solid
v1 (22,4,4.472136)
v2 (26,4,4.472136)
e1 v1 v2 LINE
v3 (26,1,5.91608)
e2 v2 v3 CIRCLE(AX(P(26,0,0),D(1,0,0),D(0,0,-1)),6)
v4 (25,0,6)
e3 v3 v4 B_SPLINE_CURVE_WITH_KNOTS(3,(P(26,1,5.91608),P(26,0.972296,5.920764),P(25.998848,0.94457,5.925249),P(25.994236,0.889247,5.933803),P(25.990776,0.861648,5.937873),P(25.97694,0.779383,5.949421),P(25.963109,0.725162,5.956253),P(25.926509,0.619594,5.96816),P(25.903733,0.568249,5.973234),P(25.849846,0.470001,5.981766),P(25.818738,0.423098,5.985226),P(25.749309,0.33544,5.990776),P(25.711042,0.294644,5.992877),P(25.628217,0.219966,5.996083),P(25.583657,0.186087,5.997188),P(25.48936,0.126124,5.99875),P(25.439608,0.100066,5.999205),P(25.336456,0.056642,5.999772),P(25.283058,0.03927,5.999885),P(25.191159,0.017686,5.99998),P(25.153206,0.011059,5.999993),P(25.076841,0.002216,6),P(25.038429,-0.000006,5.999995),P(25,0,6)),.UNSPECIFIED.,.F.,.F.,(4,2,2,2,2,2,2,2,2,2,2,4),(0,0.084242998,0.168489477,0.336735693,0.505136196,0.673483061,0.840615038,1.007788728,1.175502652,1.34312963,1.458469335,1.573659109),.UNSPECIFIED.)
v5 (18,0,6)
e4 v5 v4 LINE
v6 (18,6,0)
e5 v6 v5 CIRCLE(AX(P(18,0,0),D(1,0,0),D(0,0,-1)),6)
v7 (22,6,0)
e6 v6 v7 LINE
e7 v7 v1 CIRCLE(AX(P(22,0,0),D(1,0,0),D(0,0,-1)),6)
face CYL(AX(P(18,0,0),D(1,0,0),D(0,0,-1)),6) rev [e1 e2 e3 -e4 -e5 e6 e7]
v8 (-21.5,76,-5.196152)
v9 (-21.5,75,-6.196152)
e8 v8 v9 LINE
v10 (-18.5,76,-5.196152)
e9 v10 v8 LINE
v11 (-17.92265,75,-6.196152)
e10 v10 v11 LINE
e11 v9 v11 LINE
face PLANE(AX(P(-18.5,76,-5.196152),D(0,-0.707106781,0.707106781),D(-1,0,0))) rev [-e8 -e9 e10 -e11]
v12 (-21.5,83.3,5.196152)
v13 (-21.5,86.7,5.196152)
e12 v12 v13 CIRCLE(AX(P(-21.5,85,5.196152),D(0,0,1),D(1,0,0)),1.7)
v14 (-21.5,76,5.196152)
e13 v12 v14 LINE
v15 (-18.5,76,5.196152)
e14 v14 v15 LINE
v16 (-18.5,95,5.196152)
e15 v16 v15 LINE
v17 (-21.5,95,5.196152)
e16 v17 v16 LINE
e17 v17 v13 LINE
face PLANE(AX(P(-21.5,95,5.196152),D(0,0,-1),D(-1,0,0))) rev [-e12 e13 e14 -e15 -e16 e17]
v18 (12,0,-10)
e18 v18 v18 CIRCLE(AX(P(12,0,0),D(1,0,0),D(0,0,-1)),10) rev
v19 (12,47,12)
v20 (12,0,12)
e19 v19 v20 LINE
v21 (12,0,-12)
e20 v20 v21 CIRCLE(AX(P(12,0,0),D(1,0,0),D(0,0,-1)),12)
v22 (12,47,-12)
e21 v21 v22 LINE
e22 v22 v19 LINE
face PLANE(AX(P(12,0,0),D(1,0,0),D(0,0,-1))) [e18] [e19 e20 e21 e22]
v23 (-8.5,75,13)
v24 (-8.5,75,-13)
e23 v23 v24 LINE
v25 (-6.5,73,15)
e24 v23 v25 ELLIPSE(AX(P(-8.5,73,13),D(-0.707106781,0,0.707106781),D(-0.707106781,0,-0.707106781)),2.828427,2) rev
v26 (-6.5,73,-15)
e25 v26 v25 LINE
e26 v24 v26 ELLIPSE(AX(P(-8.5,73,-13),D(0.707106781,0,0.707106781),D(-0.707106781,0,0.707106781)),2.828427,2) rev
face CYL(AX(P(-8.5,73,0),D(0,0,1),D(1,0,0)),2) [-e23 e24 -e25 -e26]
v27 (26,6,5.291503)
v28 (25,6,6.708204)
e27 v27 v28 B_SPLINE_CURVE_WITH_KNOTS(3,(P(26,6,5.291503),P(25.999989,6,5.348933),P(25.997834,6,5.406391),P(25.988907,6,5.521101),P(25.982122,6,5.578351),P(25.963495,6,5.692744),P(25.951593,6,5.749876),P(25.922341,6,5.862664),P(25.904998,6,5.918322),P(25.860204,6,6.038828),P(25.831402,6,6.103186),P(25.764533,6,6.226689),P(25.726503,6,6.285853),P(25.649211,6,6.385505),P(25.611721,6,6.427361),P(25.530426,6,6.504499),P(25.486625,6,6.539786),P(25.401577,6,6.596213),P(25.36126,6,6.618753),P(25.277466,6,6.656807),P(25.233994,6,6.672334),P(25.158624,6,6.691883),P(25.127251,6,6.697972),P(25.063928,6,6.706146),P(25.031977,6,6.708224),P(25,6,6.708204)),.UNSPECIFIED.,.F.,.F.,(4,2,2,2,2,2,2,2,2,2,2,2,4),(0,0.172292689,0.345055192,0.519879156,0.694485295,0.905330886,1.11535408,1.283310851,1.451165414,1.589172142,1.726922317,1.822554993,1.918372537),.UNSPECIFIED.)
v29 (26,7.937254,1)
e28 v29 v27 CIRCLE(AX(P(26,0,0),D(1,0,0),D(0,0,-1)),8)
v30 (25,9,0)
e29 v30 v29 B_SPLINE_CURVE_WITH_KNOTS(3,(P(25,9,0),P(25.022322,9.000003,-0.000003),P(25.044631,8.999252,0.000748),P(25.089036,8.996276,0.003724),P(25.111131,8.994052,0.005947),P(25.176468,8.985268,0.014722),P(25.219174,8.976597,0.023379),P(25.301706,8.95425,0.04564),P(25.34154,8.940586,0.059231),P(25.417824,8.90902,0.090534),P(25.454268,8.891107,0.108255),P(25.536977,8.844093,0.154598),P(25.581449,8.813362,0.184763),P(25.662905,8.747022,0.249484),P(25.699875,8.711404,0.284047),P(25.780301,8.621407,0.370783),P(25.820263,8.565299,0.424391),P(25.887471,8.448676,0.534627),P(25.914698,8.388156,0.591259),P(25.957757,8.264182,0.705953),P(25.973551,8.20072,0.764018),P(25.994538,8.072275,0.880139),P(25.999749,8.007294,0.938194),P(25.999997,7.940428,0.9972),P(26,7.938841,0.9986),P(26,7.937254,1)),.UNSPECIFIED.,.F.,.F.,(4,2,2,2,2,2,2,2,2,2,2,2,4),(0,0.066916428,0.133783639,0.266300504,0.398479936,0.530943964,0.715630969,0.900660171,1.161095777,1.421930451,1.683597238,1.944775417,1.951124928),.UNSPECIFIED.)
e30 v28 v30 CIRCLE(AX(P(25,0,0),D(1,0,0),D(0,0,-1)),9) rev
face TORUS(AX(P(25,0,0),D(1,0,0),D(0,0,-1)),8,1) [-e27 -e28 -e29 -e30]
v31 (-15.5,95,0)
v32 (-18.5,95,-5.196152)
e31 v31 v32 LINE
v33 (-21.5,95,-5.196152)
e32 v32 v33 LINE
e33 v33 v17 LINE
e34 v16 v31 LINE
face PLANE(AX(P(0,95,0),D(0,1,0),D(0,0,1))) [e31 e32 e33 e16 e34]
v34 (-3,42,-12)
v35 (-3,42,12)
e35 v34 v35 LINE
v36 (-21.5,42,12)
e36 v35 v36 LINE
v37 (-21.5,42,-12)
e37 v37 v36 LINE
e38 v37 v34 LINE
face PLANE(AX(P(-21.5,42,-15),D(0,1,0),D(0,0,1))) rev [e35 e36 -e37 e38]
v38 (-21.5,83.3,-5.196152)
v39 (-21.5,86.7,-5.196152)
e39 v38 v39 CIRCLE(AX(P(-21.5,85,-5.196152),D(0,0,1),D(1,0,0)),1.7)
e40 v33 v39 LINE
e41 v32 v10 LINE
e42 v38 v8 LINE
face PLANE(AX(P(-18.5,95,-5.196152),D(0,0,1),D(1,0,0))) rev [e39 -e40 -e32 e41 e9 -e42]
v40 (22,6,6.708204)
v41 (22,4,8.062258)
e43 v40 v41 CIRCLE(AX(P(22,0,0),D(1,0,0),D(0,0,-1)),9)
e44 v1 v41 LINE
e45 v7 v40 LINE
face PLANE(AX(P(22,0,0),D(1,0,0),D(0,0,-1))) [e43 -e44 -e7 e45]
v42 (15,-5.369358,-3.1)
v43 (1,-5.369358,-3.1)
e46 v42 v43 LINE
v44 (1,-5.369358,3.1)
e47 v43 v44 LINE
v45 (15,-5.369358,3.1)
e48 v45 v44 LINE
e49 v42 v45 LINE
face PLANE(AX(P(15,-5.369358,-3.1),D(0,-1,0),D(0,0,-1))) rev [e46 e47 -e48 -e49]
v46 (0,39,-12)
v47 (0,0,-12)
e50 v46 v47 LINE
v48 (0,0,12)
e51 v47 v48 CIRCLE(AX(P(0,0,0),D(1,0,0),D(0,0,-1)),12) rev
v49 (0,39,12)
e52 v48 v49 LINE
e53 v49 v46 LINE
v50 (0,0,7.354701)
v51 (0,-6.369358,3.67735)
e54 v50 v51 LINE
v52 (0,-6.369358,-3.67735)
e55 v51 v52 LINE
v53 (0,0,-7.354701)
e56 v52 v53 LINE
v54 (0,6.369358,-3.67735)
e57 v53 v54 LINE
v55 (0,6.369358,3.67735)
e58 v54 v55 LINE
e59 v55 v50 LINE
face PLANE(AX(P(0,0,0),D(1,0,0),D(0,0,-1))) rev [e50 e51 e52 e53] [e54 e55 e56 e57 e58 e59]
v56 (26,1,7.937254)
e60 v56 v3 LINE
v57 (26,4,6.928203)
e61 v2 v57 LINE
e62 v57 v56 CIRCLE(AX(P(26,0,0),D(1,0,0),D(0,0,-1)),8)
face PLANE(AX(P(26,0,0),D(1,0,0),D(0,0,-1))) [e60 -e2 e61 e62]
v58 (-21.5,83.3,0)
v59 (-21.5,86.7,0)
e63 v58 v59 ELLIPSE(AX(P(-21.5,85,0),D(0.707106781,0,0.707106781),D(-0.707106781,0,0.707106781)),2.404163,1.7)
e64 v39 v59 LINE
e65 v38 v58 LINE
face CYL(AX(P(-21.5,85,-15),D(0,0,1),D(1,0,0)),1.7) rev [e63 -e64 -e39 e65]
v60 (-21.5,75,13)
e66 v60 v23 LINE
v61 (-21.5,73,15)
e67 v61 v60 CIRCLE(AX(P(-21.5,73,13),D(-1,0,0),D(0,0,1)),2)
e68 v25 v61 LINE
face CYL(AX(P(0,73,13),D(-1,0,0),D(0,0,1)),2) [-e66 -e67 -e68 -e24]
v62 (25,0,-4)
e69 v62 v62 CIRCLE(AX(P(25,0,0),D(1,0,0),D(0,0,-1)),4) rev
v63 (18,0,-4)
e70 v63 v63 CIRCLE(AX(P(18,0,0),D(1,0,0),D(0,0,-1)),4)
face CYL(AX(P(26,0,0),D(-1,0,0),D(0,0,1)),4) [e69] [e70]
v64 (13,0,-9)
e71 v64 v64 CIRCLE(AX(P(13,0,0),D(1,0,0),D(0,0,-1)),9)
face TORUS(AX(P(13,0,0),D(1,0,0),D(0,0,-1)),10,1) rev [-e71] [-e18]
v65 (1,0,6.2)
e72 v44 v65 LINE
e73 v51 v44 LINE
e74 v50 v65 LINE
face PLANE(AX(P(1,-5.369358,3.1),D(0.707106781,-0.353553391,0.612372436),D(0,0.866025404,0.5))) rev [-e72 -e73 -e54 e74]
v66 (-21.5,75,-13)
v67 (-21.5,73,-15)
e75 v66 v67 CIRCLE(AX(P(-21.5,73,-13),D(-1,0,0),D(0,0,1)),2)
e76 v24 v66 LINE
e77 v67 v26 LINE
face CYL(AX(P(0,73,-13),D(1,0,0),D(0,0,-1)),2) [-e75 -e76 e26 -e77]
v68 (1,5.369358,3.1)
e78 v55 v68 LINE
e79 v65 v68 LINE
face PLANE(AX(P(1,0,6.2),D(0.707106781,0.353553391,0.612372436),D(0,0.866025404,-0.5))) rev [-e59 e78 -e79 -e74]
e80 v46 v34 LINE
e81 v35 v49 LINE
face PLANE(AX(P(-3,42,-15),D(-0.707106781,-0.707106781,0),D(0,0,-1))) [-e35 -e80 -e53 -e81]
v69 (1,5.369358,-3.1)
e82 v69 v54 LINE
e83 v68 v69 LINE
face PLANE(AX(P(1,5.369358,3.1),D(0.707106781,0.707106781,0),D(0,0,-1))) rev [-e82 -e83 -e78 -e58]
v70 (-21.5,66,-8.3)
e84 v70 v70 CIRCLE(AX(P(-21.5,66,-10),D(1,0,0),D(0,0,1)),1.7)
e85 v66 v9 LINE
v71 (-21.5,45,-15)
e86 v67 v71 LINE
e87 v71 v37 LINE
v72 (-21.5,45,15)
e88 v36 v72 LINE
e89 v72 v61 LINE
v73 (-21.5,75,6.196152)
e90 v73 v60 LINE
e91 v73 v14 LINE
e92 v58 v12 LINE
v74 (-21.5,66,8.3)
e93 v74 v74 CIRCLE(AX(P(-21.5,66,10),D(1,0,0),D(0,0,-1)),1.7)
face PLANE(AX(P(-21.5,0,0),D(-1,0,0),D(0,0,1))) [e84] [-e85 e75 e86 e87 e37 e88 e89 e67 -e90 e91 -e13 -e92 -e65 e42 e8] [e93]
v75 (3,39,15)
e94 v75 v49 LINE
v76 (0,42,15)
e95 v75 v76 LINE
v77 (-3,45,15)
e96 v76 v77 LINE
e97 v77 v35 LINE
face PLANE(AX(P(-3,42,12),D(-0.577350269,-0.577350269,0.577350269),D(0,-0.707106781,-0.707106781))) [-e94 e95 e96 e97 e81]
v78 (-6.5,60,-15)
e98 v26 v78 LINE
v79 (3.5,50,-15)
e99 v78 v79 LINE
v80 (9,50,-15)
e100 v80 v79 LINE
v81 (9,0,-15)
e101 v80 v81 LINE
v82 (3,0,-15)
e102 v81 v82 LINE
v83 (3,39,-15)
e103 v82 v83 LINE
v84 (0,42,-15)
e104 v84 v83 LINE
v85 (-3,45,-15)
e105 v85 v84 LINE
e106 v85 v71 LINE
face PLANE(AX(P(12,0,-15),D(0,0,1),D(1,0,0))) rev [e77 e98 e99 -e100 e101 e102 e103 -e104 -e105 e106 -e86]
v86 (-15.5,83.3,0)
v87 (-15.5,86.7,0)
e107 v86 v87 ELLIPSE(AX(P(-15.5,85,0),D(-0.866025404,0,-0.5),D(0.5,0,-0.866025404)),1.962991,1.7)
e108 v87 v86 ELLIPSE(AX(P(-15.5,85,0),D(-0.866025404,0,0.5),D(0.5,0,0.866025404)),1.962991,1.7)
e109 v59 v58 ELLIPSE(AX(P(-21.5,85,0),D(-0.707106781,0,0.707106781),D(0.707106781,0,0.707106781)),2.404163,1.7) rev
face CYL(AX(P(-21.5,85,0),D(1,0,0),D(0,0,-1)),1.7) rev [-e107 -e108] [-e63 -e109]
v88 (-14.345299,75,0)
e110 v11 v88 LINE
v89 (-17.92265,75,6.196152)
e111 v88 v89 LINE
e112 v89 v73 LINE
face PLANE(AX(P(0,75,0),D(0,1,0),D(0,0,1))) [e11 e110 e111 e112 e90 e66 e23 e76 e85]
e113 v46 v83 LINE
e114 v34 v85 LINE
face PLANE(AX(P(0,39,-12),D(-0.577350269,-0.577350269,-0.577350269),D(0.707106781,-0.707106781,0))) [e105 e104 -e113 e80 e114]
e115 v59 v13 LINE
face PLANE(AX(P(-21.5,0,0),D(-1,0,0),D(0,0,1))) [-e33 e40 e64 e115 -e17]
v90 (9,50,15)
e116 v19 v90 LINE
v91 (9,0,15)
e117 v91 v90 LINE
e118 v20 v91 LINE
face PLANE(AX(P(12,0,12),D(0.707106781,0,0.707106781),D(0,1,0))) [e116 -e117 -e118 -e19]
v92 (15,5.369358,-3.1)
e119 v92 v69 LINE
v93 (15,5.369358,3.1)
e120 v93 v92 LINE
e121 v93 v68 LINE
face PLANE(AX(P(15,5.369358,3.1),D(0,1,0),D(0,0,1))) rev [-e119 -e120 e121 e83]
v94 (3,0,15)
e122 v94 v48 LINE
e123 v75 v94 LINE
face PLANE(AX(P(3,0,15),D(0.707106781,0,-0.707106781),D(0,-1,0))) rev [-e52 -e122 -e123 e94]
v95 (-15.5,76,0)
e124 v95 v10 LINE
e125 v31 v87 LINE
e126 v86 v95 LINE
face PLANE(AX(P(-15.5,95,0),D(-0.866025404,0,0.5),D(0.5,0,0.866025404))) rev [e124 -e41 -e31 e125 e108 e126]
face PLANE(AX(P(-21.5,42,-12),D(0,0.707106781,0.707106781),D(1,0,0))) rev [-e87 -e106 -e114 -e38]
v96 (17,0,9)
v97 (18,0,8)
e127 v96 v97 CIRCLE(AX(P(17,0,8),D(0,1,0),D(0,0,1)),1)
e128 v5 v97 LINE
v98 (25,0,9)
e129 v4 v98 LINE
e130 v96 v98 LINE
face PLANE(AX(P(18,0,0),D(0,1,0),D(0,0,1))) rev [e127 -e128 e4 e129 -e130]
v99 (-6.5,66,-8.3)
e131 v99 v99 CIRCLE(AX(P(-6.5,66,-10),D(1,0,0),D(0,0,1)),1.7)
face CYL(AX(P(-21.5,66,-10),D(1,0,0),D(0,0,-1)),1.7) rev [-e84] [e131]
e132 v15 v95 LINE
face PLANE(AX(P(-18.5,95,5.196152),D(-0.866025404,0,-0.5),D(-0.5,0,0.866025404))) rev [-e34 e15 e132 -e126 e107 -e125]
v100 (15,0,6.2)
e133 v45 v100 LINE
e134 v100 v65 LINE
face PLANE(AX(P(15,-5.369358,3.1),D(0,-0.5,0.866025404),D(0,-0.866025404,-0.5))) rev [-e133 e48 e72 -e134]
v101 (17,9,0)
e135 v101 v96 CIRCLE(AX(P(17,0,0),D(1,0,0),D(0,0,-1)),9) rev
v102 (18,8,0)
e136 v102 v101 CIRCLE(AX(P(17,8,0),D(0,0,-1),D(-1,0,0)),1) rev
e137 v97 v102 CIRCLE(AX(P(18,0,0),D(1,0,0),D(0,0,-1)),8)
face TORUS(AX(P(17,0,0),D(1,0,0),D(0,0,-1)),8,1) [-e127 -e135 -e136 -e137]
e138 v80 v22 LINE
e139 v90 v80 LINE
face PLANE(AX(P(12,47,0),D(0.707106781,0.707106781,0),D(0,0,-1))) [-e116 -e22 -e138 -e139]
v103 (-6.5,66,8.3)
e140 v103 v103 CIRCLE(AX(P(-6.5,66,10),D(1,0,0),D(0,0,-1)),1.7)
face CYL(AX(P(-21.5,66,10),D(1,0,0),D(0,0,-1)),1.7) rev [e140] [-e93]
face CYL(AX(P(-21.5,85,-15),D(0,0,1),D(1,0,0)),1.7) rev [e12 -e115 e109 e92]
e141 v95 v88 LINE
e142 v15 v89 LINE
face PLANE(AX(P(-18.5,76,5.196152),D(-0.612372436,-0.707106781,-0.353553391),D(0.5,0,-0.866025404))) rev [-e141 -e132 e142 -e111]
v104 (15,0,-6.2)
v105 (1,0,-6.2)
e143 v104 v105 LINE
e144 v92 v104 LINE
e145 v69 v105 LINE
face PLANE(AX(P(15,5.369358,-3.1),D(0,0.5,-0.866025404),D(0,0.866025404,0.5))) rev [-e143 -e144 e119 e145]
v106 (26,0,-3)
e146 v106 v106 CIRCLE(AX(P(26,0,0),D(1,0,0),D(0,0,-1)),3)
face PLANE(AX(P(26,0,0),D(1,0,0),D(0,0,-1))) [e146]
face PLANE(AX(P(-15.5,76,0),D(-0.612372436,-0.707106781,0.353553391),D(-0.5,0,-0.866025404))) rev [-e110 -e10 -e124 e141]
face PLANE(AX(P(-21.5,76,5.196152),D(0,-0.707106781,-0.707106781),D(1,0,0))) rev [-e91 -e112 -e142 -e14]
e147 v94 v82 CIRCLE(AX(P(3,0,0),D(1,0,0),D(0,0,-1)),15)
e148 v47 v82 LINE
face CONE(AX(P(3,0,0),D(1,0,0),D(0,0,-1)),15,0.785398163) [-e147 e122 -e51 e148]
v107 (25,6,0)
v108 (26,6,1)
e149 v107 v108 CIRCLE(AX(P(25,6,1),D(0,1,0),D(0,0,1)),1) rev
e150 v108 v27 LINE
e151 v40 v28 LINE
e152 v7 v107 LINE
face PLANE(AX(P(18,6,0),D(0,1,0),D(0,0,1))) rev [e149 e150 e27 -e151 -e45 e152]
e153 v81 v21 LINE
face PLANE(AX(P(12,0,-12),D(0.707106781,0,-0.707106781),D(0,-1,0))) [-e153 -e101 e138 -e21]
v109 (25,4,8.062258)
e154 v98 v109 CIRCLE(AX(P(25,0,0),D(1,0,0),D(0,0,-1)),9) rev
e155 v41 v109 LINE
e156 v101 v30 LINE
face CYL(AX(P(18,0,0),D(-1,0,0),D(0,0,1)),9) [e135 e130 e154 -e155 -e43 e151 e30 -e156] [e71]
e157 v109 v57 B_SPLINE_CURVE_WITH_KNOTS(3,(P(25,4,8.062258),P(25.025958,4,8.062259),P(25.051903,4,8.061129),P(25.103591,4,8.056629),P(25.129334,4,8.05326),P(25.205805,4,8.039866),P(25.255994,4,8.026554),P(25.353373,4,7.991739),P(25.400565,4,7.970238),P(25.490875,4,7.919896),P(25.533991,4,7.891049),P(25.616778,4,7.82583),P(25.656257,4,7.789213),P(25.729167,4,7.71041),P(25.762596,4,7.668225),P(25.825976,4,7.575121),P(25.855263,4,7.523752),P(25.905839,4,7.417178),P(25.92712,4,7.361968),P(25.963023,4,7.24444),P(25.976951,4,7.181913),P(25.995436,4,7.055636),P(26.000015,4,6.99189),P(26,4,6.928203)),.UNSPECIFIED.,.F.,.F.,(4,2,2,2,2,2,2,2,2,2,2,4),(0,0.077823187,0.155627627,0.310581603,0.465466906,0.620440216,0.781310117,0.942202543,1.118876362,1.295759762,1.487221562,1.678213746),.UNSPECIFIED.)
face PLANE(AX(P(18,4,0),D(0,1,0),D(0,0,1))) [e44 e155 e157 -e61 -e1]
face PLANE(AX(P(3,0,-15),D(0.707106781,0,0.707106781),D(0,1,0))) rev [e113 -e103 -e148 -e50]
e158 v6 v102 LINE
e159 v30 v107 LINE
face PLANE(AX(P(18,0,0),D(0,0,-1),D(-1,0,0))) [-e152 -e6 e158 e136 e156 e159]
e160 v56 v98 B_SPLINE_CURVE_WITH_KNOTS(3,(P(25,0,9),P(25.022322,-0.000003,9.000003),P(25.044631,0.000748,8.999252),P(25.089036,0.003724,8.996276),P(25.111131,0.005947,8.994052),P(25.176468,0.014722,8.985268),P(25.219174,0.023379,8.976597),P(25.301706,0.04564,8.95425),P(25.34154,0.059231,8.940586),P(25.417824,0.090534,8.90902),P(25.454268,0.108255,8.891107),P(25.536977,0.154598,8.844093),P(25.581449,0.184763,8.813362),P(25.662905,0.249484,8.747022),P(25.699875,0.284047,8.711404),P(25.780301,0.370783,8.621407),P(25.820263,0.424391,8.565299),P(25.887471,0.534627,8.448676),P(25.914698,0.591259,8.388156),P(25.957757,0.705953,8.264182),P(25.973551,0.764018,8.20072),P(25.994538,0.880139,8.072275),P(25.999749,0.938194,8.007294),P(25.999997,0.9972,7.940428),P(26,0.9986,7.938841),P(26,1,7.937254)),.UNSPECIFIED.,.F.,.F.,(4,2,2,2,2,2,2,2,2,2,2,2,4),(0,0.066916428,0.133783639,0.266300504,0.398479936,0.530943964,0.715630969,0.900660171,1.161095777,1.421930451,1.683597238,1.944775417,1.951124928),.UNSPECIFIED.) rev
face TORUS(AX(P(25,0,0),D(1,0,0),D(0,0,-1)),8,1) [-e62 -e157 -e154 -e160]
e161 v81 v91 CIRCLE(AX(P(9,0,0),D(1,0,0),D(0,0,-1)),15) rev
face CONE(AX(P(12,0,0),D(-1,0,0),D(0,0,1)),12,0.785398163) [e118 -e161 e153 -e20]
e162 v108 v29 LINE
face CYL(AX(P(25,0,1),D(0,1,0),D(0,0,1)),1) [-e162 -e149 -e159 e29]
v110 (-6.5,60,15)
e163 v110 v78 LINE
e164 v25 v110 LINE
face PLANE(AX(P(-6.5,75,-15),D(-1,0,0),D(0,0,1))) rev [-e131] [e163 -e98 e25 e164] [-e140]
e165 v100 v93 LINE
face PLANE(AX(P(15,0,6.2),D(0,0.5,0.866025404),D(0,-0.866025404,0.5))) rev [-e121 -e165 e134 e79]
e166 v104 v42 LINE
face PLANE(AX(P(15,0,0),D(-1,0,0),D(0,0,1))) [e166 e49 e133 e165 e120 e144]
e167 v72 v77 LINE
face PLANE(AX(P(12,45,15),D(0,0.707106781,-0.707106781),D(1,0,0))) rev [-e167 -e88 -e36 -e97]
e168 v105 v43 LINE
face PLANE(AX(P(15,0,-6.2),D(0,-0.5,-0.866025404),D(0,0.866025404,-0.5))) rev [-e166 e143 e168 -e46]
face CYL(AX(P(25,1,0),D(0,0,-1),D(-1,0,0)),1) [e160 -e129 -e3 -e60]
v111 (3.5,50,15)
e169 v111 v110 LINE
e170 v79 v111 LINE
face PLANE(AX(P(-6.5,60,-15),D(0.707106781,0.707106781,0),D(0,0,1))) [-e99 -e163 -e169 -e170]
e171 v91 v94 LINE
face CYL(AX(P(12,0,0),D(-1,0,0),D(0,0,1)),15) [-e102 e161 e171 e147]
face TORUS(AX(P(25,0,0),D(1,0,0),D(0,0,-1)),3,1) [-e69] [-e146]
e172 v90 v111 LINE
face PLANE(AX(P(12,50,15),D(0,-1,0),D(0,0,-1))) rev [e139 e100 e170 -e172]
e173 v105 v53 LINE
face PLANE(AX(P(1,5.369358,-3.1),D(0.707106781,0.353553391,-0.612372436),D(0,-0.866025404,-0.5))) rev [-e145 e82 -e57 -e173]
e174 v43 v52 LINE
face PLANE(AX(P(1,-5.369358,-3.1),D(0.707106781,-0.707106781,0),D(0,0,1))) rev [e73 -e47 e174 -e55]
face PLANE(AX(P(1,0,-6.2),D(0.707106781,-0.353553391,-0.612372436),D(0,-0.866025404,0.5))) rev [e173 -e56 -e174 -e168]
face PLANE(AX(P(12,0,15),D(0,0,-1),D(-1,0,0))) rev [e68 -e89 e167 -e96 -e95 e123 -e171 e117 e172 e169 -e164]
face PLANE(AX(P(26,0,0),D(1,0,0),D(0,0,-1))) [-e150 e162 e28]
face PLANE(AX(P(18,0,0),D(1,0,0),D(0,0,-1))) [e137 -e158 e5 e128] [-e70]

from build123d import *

# Parameters (mm, degrees)
BOSS_EXTRUDE1_DEPTH  = 12
SKETCH2_R            = 9
BOSS_EXTRUDE2_DEPTH  = 6
SKETCH3_R            = 4
BOSS_EXTRUDE7_DEPTH  = 8
BOSS_EXTRUDE8_START  = -8
BOSS_EXTRUDE8_DEPTH  = 8
BOSS_EXTRUDE9_START  = -8
BOSS_EXTRUDE9_DEPTH  = 4
BOSS_EXTRUDE11_DEPTH = 21.5
BOSS_EXTRUDE12_DEPTH = 25
CHAMFER1_SIZE        = 10
SKETCH8_R            = 1.7000000000000015
CUT_EXTRUDE1_DEPTH   = 84.10385069297331
CHAMFER2_SIZE        = 3
FILLET1_R            = 2
FILLET2_R            = 1
BOSS_EXTRUDE13_DEPTH = 20
CUT_EXTRUDE2_DEPTH   = 101.54294892174786
SKETCH11_R           = 1.7000000000000037
CUT_EXTRUDE3_DEPTH   = 105.74850838221995
CHAMFER3_SIZE        = 1
CUT_EXTRUDE5_DEPTH   = 15
CHAMFER4_SIZE        = 1
FILLET3_R            = 1


with BuildPart() as part:
    # Sketch1 → Boss-Extrude1 (new body)
    with BuildSketch(Plane(origin=(0, 0, 0), x_dir=(0, 0, -1), z_dir=(1, 0, 0))):
        with BuildLine():
            Line((-15, 0), (-15, 50))
            Line((-15, 50), (15, 50))
            Line((15, 50), (15, 0))
            ThreePointArc((15, 0), (-2.76e-15, -15), (-15, 0))
        make_face()
    extrude(amount=BOSS_EXTRUDE1_DEPTH)

    # Sketch2 → Boss-Extrude2 (add)
    with BuildSketch(Plane(origin=(12, 0, 0), x_dir=(0, 0, -1), z_dir=(1, 0, 0))):
        Circle(SKETCH2_R)
    extrude(amount=BOSS_EXTRUDE2_DEPTH)

    # Sketch3 → Boss-Extrude7 (add)
    with BuildSketch(Plane(origin=(18.000000000000004, 0, 0), x_dir=(0, 0, -1), z_dir=(1, 0, 0))):
        Circle(SKETCH3_R)
    extrude(amount=BOSS_EXTRUDE7_DEPTH)

    # Sketch5 → Boss-Extrude8 (add)
    with BuildSketch(Plane(origin=(26.000000000000004, 0, 0), x_dir=(0, 0, -1), z_dir=(1, 0, 0)).offset(BOSS_EXTRUDE8_START)):
        with BuildLine():
            Line((-9, 0), (-6.000000000000001, 0))
            ThreePointArc((-6.000000000000001, 7.3e-16), (-5.605034153776295, 2.140932538638541), (-4.4721359549995805, 3.9999999999999996))
            Line((-4.472135954999581, 4), (-8.06225774829855, 4))
            ThreePointArc((-8.062257748298551, 4), (-8.762428879445668, 2.054224946946299), (-9, 1.1e-16))
        make_face()
        with BuildLine():
            Line((-6.708203932499368, 6), (0, 6))
            Line((0, 6), (0, 9))
            ThreePointArc((0, 9), (-3.6742346141747673, 8.215838362577493), (-6.7082039324993685, 6.000000000000003))
        make_face()
    extrude(amount=BOSS_EXTRUDE8_DEPTH)

    # Sketch5<3> → Boss-Extrude9 (add)
    with BuildSketch(Plane(origin=(26.000000000000004, 0, 0), x_dir=(0, 0, -1), z_dir=(1, 0, 0)).offset(BOSS_EXTRUDE9_START)):
        with BuildLine():
            Line((-8.06225774829855, 4), (-4.472135954999581, 4))
            ThreePointArc((-4.4721359549995805, 3.9999999999999996), (-2.4494897427831788, 5.477225575051661), (3.7e-16, 6.000000000000001))
            Line((0, 6), (-6.708203932499368, 6))
            ThreePointArc((-6.7082039324993685, 6.000000000000003), (-7.452626018121394, 5.045628348780764), (-8.062257748298551, 4))
        make_face()
    extrude(amount=BOSS_EXTRUDE9_DEPTH)

    # Sketch6 → Boss-Extrude11 (add)
    with BuildSketch(Plane.ZY):
        Polygon((-15, 50), (15, 50), (15, 42), (-14.999999999999998, 42), align=None)
    extrude(amount=BOSS_EXTRUDE11_DEPTH)

    # Sketch7 → Boss-Extrude12 (add)
    with BuildSketch(Plane(origin=(0, 50, 0), x_dir=(1, 0, 0), z_dir=(0, 1, 0))):
        Polygon((-21.5, 15), (-6.499999999999999, 15), (-6.499999999999996, -15), (-21.5, -15), align=None)
    extrude(amount=BOSS_EXTRUDE12_DEPTH)

    # Chamfer1
    chamfer1_edges = [part.edges().sort_by_distance(p)[0] for p in [
        (-6.499999999999997, 50, 0),
    ]]
    chamfer(chamfer1_edges, length=CHAMFER1_SIZE)

    # Sketch8 → Cut-Extrude1 (cut, through all)
    with BuildSketch(Plane(origin=(-6.499999999999997, 0, 7.5e-16), x_dir=(-1.2e-16, 0, -1), z_dir=(1, 0, -1.2e-16))):
        with Locations((-9.999999999999998, 66.00000000000007)):
            Circle(SKETCH8_R)
        with Locations((9.999999999999998, 66.00000000000007)):
            Circle(SKETCH8_R)
    extrude(amount=-CUT_EXTRUDE1_DEPTH, mode=Mode.SUBTRACT)

    # Chamfer2
    chamfer2_edges = [part.edges().sort_by_distance(p)[0] for p in [
        (0, -14.999999999999998, -2.03e-15),
        (-10.75, 42, -14.999999999999998),
        (0, 21, -15),
        (0, 21, 15),
        (0, 42, 0),
        (-10.75, 42, 15),
        (12, -14.999999999999998, -2.03e-15),
        (12, 25, -15),
        (12, 25, 15),
        (12, 50, 0),
    ]]
    chamfer(chamfer2_edges, length=CHAMFER2_SIZE)

    # Fillet1
    fillet1_edges = [part.edges().sort_by_distance(p)[0] for p in [
        (-14, 75, -15),
        (-6.499999999999997, 75, 0),
        (-13.999999999999996, 75, 15),
    ]]
    fillet(fillet1_edges, radius=FILLET1_R)

    # Fillet2
    fillet2_edges = [part.edges().sort_by_distance(p)[0] for p in [
        (26.000000000000004, 3.8e-16, 4),
        (18, -9, 1.65e-15),
        (12, 1.1e-15, 9),
    ]]
    fillet(fillet2_edges, radius=FILLET2_R)

    # Sketch9 → Boss-Extrude13 (add)
    with BuildSketch(Plane(origin=(0, 75.00000000000001, 0), x_dir=(1, 0, 0), z_dir=(0, 1, 0))):
        Polygon((-15.500000000000007, -1.041e-14), (-18.500000000000004, 5.1961524227066205), (-21.5, 5.1961524227066205), (-21.5, -5.196152422706621), (-18.5, -5.196152422706619), align=None)
    extrude(amount=BOSS_EXTRUDE13_DEPTH)

    # Sketch10 → Cut-Extrude2 (cut, through all)
    with BuildSketch(Plane.XY.offset(5.196152422706602)):
        with BuildLine():
            Line((-21.5, 86.70000000000002), (-21.5, 83.30000000000003))
            ThreePointArc((-21.5, 83.30000000000003), (-19.80000000000001, 85.00000000000001), (-21.5, 86.70000000000002))
        make_face()
    extrude(amount=-CUT_EXTRUDE2_DEPTH, mode=Mode.SUBTRACT)

    # Sketch11 → Cut-Extrude3 (cut, through all)
    with BuildSketch(Plane(origin=(-15.500000000000007, 0, 1.79e-15), x_dir=(-1.2e-16, 0, -1), z_dir=(1, 0, -1.2e-16))):
        with Locations((-8.62e-15, 85.00000000000001)):
            Circle(SKETCH11_R)
    extrude(amount=-CUT_EXTRUDE3_DEPTH, mode=Mode.SUBTRACT)

    # Chamfer3
    chamfer3_edges = [part.edges().sort_by_distance(p)[0] for p in [
        (-20, 75.00000000000001, -5.1961524227066205),
        (-17.000000000000007, 75.00000000000001, -2.5980762113533054),
        (-20, 75.00000000000001, 5.19615242270662),
        (-17.000000000000004, 75.00000000000001, 2.5980762113533147),
    ]]
    chamfer(chamfer3_edges, length=CHAMFER3_SIZE)

    # Sketch12 → Cut-Extrude5 (cut)
    with BuildSketch(Plane.ZY):
        Polygon((6.200000000000001, 8.7e-16), (3.100000000000001, 5.369357503463521), (-3.100000000000001, 5.369357503463522), (-6.200000000000002, 1.74e-15), (-3.100000000000001, -5.3693575034635215), (3.0999999999999996, -5.369357503463523), align=None)
    extrude(amount=-CUT_EXTRUDE5_DEPTH, mode=Mode.SUBTRACT)

    # Chamfer4
    chamfer4_edges = [part.edges().sort_by_distance(p)[0] for p in [
        (0, -5.369357503463522, -4.4e-16),
        (0, -2.68467875173176, -4.650000000000001),
        (0, -2.684678751731761, 4.65),
        (0, 2.6846787517317607, 4.650000000000001),
        (0, 2.684678751731762, -4.650000000000002),
        (0, 5.3693575034635215, 0),
    ]]
    chamfer(chamfer4_edges, length=CHAMFER4_SIZE)

    # Fillet3
    fillet3_edges = [part.edges().sort_by_distance(p)[0] for p in [
        (26.000000000000004, 0, 7.5),
        (26.000000000000004, 7.5, 0),
        (26.000000000000004, 2.054224946946299, 8.762428879445668),
        (26.000000000000004, 8.215838362577493, 3.674234614174768),
    ]]
    fillet(fillet3_edges, radius=FILLET3_R)


solid = part.part
